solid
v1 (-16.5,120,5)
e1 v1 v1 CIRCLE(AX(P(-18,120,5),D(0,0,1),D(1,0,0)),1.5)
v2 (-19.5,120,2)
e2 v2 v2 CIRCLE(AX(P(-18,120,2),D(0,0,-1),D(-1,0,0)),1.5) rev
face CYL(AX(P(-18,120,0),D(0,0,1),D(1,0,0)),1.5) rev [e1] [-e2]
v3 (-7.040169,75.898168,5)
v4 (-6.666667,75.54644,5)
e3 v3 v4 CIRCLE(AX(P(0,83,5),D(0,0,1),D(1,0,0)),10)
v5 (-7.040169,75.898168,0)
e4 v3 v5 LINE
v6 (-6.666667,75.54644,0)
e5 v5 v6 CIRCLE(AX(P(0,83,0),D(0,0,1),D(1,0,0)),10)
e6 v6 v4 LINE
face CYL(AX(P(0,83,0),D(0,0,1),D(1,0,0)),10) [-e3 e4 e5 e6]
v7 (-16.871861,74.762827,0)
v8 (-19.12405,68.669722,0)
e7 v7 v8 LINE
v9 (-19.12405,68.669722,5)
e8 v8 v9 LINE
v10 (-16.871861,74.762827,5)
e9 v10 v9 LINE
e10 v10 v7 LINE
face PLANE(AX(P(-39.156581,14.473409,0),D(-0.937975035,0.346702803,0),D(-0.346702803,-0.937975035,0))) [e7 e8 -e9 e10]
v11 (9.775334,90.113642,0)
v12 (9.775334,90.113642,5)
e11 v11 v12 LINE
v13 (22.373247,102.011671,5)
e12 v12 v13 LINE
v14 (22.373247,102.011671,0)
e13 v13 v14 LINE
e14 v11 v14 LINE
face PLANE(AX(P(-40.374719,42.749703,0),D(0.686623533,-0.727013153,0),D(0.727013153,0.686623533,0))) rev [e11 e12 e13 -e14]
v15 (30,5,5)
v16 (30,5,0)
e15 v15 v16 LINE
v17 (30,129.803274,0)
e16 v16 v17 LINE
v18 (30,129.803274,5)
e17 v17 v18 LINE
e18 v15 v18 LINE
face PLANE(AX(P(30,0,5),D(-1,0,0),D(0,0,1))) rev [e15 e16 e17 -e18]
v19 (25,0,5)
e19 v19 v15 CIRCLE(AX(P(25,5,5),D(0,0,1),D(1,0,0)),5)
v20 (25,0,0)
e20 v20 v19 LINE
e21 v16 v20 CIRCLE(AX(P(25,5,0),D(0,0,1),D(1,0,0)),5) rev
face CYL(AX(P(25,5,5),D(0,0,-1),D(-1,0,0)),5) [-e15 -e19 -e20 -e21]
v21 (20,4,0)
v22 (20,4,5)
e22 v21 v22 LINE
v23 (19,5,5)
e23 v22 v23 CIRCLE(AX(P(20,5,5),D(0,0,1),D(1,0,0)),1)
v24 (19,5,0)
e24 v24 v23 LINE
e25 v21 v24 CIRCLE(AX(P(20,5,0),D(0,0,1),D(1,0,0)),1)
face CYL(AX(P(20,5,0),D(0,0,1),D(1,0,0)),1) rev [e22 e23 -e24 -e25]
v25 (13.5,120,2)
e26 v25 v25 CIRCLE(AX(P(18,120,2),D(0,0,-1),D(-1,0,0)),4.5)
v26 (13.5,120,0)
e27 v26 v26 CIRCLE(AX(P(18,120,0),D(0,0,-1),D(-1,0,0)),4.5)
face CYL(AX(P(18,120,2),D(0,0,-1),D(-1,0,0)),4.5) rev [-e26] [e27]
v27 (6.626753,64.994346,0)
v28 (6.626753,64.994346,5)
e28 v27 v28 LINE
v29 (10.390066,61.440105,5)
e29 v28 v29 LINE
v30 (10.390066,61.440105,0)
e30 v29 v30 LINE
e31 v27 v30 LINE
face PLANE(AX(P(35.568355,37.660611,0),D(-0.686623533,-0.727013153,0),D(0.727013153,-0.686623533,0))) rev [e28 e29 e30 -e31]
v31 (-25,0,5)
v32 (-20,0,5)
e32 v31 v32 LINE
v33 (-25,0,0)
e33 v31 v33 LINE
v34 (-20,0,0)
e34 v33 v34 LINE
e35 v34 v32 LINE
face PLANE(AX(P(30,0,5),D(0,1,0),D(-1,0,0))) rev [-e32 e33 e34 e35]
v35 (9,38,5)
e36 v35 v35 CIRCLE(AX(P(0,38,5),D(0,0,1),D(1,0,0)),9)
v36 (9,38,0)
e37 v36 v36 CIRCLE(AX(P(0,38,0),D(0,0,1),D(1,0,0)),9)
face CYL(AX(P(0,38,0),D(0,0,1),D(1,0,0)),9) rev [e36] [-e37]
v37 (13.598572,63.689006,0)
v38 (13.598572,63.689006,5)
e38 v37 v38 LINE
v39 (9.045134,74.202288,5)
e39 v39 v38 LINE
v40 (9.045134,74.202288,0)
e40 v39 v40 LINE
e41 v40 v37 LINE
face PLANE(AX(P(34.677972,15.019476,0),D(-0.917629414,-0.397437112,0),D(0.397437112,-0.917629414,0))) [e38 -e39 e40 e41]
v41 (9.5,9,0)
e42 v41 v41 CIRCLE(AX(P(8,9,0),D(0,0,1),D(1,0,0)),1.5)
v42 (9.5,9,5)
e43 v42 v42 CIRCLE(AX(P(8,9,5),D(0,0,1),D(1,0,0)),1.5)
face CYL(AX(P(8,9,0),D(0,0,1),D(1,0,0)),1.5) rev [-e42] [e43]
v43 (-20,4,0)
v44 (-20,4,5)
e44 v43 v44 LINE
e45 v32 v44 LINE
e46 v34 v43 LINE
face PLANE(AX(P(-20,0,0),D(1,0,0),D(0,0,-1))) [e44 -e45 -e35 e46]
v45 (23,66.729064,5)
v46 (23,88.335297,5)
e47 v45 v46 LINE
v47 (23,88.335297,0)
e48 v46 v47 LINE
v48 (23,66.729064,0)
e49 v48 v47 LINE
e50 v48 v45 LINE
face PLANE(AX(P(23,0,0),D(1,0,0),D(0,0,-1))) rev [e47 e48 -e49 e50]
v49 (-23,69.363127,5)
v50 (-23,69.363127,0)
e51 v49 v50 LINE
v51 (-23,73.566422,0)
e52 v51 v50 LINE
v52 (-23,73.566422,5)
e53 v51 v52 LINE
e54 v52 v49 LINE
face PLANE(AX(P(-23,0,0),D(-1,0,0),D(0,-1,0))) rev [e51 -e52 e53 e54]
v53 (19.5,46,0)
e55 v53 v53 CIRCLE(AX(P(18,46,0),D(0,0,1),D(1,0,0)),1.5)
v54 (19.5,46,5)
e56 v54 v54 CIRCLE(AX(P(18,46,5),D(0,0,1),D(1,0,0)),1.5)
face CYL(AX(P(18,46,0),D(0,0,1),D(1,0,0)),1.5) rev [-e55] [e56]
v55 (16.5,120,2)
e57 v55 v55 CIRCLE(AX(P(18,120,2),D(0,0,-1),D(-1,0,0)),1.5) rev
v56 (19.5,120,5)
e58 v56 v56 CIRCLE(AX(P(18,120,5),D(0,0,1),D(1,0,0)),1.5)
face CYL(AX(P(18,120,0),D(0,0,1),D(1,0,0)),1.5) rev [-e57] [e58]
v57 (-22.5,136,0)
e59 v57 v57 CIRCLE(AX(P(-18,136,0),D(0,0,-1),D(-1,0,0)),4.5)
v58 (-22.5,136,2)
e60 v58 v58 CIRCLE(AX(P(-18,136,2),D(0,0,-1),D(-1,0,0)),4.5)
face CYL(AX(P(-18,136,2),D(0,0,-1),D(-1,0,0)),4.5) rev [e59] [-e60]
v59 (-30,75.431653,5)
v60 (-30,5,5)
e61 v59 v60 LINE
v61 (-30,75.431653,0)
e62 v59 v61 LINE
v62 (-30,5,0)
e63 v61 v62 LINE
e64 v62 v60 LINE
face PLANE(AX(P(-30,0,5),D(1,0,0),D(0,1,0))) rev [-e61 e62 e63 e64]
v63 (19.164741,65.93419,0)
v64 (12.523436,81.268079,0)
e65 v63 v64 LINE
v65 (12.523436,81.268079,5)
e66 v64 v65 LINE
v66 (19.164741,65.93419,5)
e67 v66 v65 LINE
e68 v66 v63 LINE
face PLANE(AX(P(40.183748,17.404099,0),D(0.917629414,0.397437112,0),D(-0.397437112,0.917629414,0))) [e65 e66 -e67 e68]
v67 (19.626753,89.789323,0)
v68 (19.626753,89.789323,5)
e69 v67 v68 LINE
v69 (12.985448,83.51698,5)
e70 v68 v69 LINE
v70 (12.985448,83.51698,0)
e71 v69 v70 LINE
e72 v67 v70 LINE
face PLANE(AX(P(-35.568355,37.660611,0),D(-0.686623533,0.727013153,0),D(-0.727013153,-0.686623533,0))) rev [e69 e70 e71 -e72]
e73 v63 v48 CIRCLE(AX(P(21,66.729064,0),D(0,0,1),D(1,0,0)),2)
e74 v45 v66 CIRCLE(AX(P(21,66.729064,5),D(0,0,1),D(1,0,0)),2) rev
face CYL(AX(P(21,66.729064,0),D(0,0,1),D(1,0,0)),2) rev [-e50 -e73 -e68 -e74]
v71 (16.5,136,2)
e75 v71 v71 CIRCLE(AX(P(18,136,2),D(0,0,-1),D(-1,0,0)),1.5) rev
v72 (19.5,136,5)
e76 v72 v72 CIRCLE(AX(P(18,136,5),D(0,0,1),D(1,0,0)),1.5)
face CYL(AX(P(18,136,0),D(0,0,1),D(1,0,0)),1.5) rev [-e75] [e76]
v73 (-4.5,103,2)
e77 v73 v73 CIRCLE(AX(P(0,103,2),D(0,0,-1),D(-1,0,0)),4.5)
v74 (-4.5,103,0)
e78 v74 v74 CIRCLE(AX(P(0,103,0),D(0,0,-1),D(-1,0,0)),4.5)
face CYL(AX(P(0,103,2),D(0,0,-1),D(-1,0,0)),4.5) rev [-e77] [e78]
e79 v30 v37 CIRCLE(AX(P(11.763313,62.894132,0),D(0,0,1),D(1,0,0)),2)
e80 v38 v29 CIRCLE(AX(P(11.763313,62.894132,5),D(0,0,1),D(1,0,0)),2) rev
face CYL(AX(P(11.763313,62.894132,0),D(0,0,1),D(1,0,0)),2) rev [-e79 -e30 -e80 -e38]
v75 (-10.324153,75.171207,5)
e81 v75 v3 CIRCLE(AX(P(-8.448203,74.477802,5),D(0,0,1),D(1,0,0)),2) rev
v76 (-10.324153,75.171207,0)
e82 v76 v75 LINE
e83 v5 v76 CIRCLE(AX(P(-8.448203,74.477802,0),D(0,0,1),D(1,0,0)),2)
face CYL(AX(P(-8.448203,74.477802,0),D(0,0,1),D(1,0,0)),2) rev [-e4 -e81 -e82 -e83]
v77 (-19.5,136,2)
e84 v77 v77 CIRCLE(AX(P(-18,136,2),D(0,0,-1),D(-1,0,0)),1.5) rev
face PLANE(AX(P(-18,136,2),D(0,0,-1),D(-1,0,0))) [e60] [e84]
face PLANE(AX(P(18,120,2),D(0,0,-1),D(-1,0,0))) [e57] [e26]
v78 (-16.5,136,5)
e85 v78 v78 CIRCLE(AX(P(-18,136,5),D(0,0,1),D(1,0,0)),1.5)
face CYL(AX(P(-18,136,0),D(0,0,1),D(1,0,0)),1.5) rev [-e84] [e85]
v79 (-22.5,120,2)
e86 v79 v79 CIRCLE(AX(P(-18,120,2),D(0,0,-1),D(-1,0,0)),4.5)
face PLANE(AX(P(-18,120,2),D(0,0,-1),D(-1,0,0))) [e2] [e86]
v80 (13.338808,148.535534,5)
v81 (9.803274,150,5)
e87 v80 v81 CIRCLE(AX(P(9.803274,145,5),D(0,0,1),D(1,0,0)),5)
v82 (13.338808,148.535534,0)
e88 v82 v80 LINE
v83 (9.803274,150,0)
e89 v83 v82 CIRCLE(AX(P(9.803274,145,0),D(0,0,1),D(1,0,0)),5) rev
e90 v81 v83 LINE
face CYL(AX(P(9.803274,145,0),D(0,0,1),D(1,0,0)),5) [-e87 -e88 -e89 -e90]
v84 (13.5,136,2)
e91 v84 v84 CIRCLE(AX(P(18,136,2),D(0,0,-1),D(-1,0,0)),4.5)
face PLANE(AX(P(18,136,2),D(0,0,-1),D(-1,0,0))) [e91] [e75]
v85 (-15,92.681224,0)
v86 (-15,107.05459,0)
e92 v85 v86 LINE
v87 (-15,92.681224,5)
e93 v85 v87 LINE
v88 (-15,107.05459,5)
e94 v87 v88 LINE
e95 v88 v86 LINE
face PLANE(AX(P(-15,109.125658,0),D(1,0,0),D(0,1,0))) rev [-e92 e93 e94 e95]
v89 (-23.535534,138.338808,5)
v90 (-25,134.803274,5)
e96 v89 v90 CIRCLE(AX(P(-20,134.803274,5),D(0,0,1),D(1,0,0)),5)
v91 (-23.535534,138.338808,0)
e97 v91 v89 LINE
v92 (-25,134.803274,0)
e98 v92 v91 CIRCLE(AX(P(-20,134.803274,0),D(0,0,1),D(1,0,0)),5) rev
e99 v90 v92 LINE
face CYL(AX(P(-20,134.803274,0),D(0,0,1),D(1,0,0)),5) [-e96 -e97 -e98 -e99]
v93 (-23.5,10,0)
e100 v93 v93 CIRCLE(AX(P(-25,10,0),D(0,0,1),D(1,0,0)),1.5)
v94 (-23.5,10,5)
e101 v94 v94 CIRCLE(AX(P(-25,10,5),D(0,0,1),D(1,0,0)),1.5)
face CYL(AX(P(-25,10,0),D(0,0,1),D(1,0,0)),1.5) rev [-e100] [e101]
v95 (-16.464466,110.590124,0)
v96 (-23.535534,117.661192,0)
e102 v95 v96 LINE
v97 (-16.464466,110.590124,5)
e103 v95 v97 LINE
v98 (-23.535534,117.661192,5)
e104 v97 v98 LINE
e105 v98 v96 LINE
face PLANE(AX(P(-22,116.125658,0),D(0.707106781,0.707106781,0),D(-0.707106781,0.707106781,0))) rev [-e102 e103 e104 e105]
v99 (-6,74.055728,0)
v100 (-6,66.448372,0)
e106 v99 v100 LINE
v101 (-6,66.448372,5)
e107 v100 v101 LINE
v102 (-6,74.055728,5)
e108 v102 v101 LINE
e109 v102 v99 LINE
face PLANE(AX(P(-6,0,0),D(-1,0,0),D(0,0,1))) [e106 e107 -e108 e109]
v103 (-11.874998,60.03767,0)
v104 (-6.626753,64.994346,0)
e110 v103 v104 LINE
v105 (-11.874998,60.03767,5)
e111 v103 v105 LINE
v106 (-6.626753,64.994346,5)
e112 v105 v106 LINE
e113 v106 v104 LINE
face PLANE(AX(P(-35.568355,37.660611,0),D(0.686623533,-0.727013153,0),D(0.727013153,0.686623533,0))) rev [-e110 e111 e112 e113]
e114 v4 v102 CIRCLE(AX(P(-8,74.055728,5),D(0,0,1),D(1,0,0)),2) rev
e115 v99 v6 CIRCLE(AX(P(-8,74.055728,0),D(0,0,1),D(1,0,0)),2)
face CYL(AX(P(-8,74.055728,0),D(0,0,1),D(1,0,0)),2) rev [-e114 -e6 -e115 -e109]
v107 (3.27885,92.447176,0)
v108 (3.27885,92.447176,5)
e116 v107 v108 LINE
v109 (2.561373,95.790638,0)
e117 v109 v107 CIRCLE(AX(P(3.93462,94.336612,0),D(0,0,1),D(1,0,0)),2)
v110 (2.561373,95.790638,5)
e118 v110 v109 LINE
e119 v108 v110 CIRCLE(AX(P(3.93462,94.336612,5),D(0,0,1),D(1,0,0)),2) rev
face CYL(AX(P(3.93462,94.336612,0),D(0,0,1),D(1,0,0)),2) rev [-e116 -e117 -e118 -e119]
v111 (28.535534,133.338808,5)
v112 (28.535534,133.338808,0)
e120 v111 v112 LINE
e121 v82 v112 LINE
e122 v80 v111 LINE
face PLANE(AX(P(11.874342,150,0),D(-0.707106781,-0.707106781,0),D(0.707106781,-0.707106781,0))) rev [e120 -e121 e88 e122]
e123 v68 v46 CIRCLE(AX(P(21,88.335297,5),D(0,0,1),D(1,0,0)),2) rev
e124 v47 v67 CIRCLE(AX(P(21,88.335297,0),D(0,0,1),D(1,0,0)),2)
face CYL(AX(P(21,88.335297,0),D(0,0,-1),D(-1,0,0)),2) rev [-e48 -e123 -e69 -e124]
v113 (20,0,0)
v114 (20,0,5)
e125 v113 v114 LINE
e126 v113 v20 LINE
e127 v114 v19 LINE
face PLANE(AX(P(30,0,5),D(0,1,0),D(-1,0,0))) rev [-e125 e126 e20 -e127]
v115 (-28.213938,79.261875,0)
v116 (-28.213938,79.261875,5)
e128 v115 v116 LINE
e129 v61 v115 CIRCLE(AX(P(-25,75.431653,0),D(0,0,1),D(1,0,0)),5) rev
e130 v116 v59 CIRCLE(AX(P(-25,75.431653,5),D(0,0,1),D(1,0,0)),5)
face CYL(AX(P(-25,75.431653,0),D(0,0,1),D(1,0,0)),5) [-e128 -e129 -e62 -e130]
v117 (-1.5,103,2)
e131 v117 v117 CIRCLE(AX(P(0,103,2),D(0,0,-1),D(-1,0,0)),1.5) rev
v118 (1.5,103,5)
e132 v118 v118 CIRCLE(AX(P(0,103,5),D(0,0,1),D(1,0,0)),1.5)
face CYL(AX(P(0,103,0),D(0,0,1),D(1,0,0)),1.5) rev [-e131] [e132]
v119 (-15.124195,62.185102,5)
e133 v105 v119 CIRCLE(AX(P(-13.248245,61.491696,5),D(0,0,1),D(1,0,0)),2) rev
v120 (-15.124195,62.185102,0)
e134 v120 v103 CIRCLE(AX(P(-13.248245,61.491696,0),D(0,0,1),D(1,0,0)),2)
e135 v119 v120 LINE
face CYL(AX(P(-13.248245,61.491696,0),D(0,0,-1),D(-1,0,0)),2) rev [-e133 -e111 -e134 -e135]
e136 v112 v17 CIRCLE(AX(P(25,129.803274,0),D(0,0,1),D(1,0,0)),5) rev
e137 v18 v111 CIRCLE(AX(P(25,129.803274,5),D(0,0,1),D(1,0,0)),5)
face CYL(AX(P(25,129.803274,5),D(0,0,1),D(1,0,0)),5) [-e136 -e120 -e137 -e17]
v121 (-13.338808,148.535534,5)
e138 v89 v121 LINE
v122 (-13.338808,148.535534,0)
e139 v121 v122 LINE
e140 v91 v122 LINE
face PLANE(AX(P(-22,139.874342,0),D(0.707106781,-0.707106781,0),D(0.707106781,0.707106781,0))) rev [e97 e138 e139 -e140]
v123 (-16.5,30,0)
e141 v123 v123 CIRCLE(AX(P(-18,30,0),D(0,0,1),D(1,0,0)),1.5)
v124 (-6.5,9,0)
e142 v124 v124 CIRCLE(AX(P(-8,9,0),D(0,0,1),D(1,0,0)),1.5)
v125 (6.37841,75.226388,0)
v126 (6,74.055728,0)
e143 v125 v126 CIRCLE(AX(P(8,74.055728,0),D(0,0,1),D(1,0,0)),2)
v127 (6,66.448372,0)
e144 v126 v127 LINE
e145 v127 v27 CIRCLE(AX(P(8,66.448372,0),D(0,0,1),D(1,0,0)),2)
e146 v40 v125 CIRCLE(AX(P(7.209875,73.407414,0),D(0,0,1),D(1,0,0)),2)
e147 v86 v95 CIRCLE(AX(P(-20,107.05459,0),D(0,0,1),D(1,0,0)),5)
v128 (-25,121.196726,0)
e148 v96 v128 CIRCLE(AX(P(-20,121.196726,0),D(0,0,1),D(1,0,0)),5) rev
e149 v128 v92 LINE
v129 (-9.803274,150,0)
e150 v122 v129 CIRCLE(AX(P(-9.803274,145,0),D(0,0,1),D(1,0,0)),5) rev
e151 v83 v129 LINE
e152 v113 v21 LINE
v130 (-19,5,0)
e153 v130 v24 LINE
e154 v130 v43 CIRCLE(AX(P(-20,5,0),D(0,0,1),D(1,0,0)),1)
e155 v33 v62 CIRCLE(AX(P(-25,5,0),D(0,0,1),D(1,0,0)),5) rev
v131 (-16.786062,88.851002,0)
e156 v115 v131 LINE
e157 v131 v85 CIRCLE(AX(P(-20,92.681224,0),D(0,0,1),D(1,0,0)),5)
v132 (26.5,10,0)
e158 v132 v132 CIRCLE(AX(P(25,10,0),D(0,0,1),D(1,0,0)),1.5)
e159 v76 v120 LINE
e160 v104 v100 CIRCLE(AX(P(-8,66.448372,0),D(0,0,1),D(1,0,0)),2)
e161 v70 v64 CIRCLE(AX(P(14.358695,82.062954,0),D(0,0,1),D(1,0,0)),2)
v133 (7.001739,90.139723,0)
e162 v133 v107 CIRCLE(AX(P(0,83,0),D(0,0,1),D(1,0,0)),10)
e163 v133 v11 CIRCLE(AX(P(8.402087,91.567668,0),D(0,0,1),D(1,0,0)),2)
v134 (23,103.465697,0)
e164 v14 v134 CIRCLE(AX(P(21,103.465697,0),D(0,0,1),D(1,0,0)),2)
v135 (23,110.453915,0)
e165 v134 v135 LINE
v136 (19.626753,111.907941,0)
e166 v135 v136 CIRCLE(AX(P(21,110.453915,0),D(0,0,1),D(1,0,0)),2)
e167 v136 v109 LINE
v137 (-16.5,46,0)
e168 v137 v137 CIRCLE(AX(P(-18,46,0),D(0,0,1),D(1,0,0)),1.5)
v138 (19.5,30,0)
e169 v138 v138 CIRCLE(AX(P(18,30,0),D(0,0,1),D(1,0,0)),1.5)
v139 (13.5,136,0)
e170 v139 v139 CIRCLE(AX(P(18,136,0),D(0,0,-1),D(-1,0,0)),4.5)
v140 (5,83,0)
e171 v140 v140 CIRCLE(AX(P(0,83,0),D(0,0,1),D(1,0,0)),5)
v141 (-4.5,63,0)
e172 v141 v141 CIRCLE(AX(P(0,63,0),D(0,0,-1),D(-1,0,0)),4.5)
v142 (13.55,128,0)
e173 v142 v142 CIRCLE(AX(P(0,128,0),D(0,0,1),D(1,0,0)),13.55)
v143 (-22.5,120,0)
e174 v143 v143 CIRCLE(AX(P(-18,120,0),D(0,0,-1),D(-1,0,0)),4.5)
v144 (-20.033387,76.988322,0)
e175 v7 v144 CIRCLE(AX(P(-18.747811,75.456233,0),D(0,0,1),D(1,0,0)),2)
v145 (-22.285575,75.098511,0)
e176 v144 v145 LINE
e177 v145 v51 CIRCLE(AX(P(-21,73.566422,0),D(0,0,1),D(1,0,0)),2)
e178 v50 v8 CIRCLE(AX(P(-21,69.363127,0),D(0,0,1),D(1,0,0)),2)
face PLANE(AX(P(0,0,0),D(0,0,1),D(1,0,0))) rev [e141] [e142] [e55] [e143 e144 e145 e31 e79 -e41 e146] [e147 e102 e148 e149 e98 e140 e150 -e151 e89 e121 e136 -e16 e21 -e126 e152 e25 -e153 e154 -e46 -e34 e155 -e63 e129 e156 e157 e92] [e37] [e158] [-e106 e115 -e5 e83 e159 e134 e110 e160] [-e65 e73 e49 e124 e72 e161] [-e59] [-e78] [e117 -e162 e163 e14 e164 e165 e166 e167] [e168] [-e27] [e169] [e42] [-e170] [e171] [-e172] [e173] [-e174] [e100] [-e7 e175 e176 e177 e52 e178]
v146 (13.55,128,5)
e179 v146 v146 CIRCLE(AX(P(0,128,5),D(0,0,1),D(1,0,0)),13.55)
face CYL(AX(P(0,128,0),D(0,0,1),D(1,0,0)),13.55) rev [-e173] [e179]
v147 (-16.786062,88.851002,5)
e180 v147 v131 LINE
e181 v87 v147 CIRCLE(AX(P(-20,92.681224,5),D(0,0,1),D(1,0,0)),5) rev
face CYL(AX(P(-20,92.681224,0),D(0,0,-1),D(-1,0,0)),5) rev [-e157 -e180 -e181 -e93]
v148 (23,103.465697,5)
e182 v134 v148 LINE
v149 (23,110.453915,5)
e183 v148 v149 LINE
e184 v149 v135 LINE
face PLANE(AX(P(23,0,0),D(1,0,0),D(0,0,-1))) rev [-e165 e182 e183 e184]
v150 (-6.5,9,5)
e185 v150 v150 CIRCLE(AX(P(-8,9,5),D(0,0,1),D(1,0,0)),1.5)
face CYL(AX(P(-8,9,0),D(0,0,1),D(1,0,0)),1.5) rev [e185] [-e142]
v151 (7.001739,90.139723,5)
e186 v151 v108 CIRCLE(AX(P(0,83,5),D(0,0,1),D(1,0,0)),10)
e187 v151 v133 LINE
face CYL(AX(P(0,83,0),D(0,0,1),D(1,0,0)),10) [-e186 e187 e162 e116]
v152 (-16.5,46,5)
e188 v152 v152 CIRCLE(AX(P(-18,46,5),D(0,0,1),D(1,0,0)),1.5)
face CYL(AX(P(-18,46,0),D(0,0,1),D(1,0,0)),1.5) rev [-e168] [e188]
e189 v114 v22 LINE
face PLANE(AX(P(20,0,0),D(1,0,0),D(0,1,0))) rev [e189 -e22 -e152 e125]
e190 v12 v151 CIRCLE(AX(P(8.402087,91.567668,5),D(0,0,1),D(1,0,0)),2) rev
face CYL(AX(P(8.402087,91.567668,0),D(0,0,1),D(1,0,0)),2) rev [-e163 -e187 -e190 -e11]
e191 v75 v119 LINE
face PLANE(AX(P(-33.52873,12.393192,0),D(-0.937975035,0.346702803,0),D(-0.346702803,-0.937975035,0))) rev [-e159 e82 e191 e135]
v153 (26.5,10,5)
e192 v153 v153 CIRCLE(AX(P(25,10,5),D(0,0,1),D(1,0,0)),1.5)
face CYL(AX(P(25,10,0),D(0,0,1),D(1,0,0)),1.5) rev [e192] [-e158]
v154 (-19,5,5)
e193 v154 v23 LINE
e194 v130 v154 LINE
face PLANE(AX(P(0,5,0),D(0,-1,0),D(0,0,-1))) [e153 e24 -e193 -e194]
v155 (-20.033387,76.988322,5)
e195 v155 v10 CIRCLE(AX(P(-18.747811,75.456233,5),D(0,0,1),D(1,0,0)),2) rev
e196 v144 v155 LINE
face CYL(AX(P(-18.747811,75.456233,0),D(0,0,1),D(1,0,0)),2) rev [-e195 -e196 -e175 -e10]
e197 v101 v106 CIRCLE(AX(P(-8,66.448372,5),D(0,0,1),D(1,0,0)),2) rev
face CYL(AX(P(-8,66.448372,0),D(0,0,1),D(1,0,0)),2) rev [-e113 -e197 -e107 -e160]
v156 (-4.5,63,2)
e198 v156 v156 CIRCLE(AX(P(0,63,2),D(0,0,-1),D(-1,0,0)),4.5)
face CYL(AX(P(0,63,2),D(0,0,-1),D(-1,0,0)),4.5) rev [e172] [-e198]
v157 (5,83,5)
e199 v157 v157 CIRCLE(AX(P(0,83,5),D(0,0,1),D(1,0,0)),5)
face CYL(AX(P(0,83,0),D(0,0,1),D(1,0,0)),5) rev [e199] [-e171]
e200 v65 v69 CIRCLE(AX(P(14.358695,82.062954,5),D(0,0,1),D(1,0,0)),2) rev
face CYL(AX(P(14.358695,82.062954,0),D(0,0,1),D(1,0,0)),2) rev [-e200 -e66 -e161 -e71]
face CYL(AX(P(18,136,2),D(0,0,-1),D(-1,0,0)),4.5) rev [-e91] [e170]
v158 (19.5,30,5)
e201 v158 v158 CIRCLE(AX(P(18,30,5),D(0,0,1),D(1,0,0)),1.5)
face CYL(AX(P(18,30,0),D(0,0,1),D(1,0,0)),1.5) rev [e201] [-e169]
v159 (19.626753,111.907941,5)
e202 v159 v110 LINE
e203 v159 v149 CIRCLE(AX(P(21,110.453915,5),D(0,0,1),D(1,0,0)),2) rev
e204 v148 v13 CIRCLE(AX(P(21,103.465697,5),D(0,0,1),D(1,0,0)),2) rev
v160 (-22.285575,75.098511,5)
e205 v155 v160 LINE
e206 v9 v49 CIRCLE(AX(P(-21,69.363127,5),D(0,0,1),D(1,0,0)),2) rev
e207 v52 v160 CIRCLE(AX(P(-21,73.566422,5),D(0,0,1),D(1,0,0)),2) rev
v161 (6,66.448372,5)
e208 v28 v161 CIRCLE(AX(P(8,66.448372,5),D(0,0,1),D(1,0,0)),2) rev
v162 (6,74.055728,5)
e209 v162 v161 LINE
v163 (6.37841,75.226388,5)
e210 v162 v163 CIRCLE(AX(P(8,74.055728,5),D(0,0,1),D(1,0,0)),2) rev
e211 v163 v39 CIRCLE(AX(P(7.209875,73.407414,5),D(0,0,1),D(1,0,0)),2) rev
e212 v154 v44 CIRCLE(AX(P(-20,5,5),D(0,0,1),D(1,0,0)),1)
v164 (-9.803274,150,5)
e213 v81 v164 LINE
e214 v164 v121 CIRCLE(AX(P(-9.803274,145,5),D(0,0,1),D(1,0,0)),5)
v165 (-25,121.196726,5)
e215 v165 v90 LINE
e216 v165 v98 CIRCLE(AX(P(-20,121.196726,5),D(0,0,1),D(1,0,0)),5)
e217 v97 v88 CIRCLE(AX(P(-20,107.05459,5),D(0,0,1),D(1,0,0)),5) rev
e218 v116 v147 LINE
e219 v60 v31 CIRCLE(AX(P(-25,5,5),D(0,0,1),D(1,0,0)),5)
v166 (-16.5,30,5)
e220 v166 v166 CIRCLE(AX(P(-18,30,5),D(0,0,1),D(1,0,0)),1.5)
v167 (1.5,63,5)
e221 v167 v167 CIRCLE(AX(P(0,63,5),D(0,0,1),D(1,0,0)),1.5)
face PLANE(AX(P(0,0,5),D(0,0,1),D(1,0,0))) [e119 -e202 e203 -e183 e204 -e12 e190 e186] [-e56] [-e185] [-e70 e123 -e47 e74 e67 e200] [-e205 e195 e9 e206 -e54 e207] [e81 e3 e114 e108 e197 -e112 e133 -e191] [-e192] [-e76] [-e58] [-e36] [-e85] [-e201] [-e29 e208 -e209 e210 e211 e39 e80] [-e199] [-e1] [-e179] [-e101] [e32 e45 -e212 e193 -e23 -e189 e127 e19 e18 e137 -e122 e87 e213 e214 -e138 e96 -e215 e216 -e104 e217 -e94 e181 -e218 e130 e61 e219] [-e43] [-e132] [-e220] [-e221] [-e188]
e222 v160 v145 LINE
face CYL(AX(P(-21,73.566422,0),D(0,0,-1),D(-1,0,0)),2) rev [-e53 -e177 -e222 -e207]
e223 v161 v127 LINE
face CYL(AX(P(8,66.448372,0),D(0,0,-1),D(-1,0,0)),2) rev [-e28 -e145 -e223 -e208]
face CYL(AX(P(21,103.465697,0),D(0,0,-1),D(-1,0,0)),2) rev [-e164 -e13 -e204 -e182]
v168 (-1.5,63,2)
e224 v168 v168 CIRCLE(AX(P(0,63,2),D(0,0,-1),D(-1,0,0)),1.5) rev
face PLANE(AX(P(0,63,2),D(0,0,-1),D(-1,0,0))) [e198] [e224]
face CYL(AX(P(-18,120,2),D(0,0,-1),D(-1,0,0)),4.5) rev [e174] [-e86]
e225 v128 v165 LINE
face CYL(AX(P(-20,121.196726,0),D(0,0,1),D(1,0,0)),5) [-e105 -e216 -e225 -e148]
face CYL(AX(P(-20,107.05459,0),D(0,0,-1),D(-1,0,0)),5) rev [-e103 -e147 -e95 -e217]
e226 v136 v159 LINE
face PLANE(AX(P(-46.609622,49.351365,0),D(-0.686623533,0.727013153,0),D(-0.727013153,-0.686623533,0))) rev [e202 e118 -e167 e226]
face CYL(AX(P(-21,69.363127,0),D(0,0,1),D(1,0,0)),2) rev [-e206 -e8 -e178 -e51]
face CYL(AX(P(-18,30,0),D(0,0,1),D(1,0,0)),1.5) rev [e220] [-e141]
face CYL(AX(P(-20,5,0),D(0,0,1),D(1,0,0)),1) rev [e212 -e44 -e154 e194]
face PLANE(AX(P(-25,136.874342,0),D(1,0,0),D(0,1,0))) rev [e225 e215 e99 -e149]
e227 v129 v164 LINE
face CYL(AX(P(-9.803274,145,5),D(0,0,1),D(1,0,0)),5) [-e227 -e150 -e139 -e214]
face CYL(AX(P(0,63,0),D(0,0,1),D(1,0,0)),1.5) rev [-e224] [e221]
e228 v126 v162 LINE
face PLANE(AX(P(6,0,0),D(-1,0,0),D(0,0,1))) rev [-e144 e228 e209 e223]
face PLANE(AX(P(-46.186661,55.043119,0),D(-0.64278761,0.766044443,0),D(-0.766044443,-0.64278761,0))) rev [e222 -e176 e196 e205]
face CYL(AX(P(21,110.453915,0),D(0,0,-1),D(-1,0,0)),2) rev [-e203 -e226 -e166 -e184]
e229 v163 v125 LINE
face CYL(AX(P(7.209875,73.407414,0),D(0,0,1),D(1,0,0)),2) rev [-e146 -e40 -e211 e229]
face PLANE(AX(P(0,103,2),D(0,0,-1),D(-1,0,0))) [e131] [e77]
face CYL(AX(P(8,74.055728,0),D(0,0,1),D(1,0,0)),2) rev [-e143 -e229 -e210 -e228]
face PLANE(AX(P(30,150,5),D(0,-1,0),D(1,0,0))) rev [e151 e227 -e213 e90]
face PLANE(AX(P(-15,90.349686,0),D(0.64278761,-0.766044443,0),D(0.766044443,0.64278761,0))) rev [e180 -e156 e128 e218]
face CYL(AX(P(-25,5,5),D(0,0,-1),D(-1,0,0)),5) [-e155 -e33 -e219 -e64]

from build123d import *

# Parameters (mm, degrees)
SKETCH_1_W             = 60
SKETCH_1_H             = 150
EXTRUDE_1_DEPTH        = 5
SKETCH_2_R             = 1.5
CUT_EXTRUDE_1_DEPTH    = 5
SKETCH_4_R             = 13.55
SKETCH_4_R_2           = 9
CUT_EXTRUDE_1570_DEPTH = 154.05227865
CUT_EXTRUDE_2_DEPTH    = 154.05227865
SKETCH_6_R             = 5
CUT_EXTRUDE_3_DEPTH    = 154.05227865
SKETCH_7_R             = 1.5
CUT_EXTRUDE_4_DEPTH    = 154.05227865
SKETCH_8_R             = 4.5
CUT_EXTRUDE_5_DEPTH    = 2
CUT_EXTRUDE_6_DEPTH    = 154.05227865
FILLET_3_R             = 2
FILLET_4_R             = 5


with BuildPart() as part:
    # 草图1 → 凸台-拉伸1 (new body)
    with BuildSketch(Plane.XY):
        with Locations((0, 75)):
            Rectangle(SKETCH_1_W, SKETCH_1_H)
    extrude(amount=EXTRUDE_1_DEPTH)

    # 草图2 → 切除-拉伸1 (cut)
    with BuildSketch(Plane.XY.offset(5)):
        with BuildLine():
            Line((-20, 4), (-20, 0))
            Line((-20, 0), (20, 0))
            Line((20, 0), (20, 4))
            ThreePointArc((20, 4), (20.707106781, 5.707106781), (19, 5))
            Line((19, 5), (-19, 5))
            ThreePointArc((-19, 5), (-20.707106781, 5.707106781), (-20, 4))
        make_face()
        with Locations((-25, 10)):
            Circle(SKETCH_2_R)
        with Locations((25, 10)):
            Circle(SKETCH_2_R)
        with Locations((8, 9)):
            Circle(SKETCH_2_R)
        with Locations((-8, 9)):
            Circle(SKETCH_2_R)
    extrude(amount=-CUT_EXTRUDE_1_DEPTH, mode=Mode.SUBTRACT)

    # 草图4 → Cut-Extrude 1570 (cut, through all)
    with BuildSketch(Plane.XY.offset(5)):
        with Locations((0, 128)):
            Circle(SKETCH_4_R)
        with Locations((0, 38)):
            Circle(SKETCH_4_R_2)
    extrude(amount=-CUT_EXTRUDE_1570_DEPTH, mode=Mode.SUBTRACT)

    # 草图5 → 切除-拉伸2 (cut, through all)
    with BuildSketch(Plane.XY.offset(5)):
        Polygon((-15, 106.983208217), (-15, 90.349685577), (-30, 77.76319111), (-30, 124.859512106), (-30, 150), (-11.874342087, 150), (-22, 139.874342087), (-25, 136.874342087), (-25, 119.125657913), (-22, 116.125657913), (-15, 109.125657913), align=None)
        Polygon((11.874342087, 150), (30, 131.874342087), (30, 150), align=None)
    extrude(amount=-CUT_EXTRUDE_2_DEPTH, mode=Mode.SUBTRACT)

    # 草图6 → 切除-拉伸3 (cut, through all)
    with BuildSketch(Plane.XY.offset(5)):
        with Locations((0, 83)):
            Circle(SKETCH_6_R)
    extrude(amount=-CUT_EXTRUDE_3_DEPTH, mode=Mode.SUBTRACT)

    # 草图7 → 切除-拉伸4 (cut, through all)
    with BuildSketch(Plane.XY.offset(5)):
        with Locations((18, 136)):
            Circle(SKETCH_7_R)
        with Locations((-18, 136)):
            Circle(SKETCH_7_R)
        with Locations((-18, 120)):
            Circle(SKETCH_7_R)
        with Locations((18, 120)):
            Circle(SKETCH_7_R)
        with Locations((0, 63)):
            Circle(SKETCH_7_R)
        with Locations((0, 103)):
            Circle(SKETCH_7_R)
        with Locations((-18, 46)):
            Circle(SKETCH_7_R)
        with Locations((-18, 30)):
            Circle(SKETCH_7_R)
        with Locations((18, 46)):
            Circle(SKETCH_7_R)
        with Locations((18, 30)):
            Circle(SKETCH_7_R)
    extrude(amount=-CUT_EXTRUDE_4_DEPTH, mode=Mode.SUBTRACT)

    # 草图8 → 切除-拉伸5 (cut)
    with BuildSketch(Plane(origin=(0, 0, 0), x_dir=(-1, 0, 0), z_dir=(0, 0, -1))):
        with Locations((-18, 136)):
            Circle(SKETCH_8_R)
        with Locations((18, 136)):
            Circle(SKETCH_8_R)
        with Locations((-18, 120)):
            Circle(SKETCH_8_R)
        with Locations((18, 120)):
            Circle(SKETCH_8_R)
        with Locations((0, 103)):
            Circle(SKETCH_8_R)
        with Locations((0, 63)):
            Circle(SKETCH_8_R)
    extrude(amount=-CUT_EXTRUDE_5_DEPTH, mode=Mode.SUBTRACT)

    # 草图9 → 切除-拉伸6 (cut, through all)
    with BuildSketch(Plane.XY.offset(5)):
        Polygon((-23, 58.183667551), (-14.257978987, 81.83446411), (-23, 74.499037502), align=None)
        with BuildLine():
            ThreePointArc((-6, 75), (-7.735015794, 76.662056275), (-9.023511491, 78.689983716))
            Line((-9.023511491, 78.689983716), (-18.086264707, 54.171473379))
            Line((-18.086264707, 54.171473379), (-6, 65.586278935))
            Line((-6, 65.586278935), (-6, 75))
        make_face()
        with BuildLine():
            ThreePointArc((7.893692694, 76.860813111), (7.008875126, 75.867281761), (6, 75))
            Line((6, 75), (6, 65.586278935))
            Line((6, 65.586278935), (17.467722447, 54.75565218))
            Line((17.467722447, 54.75565218), (7.893692694, 76.860813111))
        make_face()
        Polygon((23, 92.975167824), (11.96629434, 82.554445812), (12.398973079, 81.555448171), (23, 57.079087413), align=None)
        with BuildLine():
            Line((23, 115.093785686), (-0.401978174, 92.991917411))
            ThreePointArc((-0.401978174, 92.991917411), (4.47705407, 91.941811162), (8.240956067, 88.664507313))
            Line((8.240956067, 88.664507313), (23, 102.60360436))
            Line((23, 102.60360436), (23, 115.093785686))
        make_face()
    extrude(amount=-CUT_EXTRUDE_6_DEPTH, mode=Mode.SUBTRACT)

    # 圆角3
    # the kernel refuses this fillet: 2 mm, written as the material it adds along each edge
    with BuildSketch(Plane(origin=(-9.023511491, 78.689983716, 5), x_dir=(-0.34670280320630176, -0.9379750349816846, 0), z_dir=(0, 0, -1))) as fillet_3_piece_1:
        with BuildLine():
            CenterArc((3.751460465, -2), FILLET_3_R, 90, 114.464402838)
            ThreePointArc((1.931022987, -2.82825563), (1.087482709, -1.330850611), (0, 0))
            Line((0, 0), (3.751460465, 0))
        make_face()
    extrude(amount=5)
    with BuildSketch(Plane(origin=(-6, 75, 5), x_dir=(-0.7733966621340284, 0.6339223950926041, 0), z_dir=(0, 0, -1))) as fillet_3_piece_2:
        with BuildLine():
            CenterArc((0.948198213, -1.998141534), FILLET_3_R, 92.470208625, 48.189685104)
            Line((-0.598595111, -0.730296743), (0, 0))
            ThreePointArc((0, 0), (0.430999188, -0.009292332), (0.861998376, 0))
        make_face()
    extrude(amount=5)
    with BuildSketch(Plane(origin=(-6, 65.586278935, 5), x_dir=(0, 1, 0), z_dir=(0, 0, -1)), Plane(origin=(6, 65.586278935, 5), x_dir=(0.7270131525498171, -0.6866235329637167, 0), z_dir=(0, 0, -1))) as fillet_3_piece_3:
        with BuildLine():
            CenterArc((FILLET_3_R * 0.431046489238, -FILLET_3_R), FILLET_3_R, 90, 46.636577042)
            Line((-FILLET_3_R * 0.295966663312, -FILLET_3_R * 0.313376467036), (0, 0))
            Line((0, 0), (FILLET_3_R * 0.431046489238, 0))
        make_face()
    extrude(amount=5)
    with BuildSketch(Plane(origin=(-18.086264707, 54.171473379, 5), x_dir=(0.3467028032063488, 0.9379750349816672, 0), z_dir=(0, 0, -1))) as fillet_3_piece_4:
        with BuildLine():
            CenterArc((FILLET_3_R * 4.2717705967, FILLET_3_R), FILLET_3_R, 116.350801131, 153.649198869)
            Line((FILLET_3_R * 3.82790471313, FILLET_3_R * 1.89609323031), (0, 0))
            Line((0, 0), (FILLET_3_R * 4.2717705967, 0))
        make_face()
    extrude(amount=5)
    with BuildSketch(Plane(origin=(6, 75, 5), x_dir=(0, -1, 0), z_dir=(0, 0, -1))) as fillet_3_piece_5:
        with BuildLine():
            CenterArc((0.94427191, -2), FILLET_3_R, 90, 48.189685104)
            ThreePointArc((-0.546440075, -0.666666667), (-0.266033379, -0.339223951), (0, 0))
            Line((0, 0), (0.94427191, 0))
        make_face()
    extrude(amount=5)
    with BuildSketch(Plane(origin=(7.893692694, 76.860813111, 5), x_dir=(0.39743711176533947, -0.9176294144106459, 0), z_dir=(0, 0, -1))) as fillet_3_piece_6:
        with BuildLine():
            CenterArc((2.897165869, 2), FILLET_3_R, 166.489199346, 103.510800654)
            ThreePointArc((0.952514075, 2.467257316), (0.558182396, 1.202000398), (0, 0))
            Line((0, 0), (2.897165869, 0))
        make_face()
    extrude(amount=5)
    with BuildSketch(Plane(origin=(17.467722447, 54.75565218, 5), x_dir=(-0.39743711176536367, 0.9176294144106355, 0), z_dir=(0, 0, -1))) as fillet_3_piece_7:
        with BuildLine():
            CenterArc((FILLET_3_R * 4.86762612827, -FILLET_3_R), FILLET_3_R, 90, 156.781480378)
            Line((FILLET_3_R * 4.47338714864, -FILLET_3_R * 1.91900795804), (0, 0))
            Line((0, 0), (FILLET_3_R * 4.86762612827, 0))
        make_face()
    extrude(amount=5)
    with BuildSketch(Plane(origin=(8.240956067, 88.664507313, 5), x_dir=(0.7270131525498188, 0.6866235329637153, 0), z_dir=(0, 0, -1))) as fillet_3_piece_8:
        with BuildLine():
            CenterArc((2.110522706, -2), FILLET_3_R, 90, 87.804380429)
            ThreePointArc((0.111991009, -1.923377175), (0.102424036, -0.958985229), (0, 0))
            Line((0, 0), (2.110522706, 0))
        make_face()
    extrude(amount=5)
    with BuildSketch(Plane(origin=(-0.401978174, 92.991917411, 5), x_dir=(0.9892255370424882, -0.14639957944953544, 0), z_dir=(0, 0, -1))) as fillet_3_piece_9:
        with BuildLine():
            CenterArc((4.09301108, -1.965082086), FILLET_3_R, 100.722120143, 117.496122758)
            Line((2.521691174, -3.202399246), (0, 0))
            ThreePointArc((0, 0), (1.860459582, -0.174589569), (3.720919164, 0))
        make_face()
    extrude(amount=5)
    with BuildSketch(Plane(origin=(23, 115.093785686, 5), x_dir=(-0.7270131525498174, -0.6866235329637166, 0), z_dir=(0, 0, -1))) as fillet_3_piece_10:
        with BuildLine():
            CenterArc((FILLET_3_R * 2.31993537813, -FILLET_3_R), FILLET_3_R, 90, 133.363422958)
            Line((FILLET_3_R * 1.59292222558, -FILLET_3_R * 1.68662353296), (0, 0))
            Line((0, 0), (FILLET_3_R * 2.31993537813, 0))
        make_face()
    extrude(amount=5)
    with BuildSketch(Plane(origin=(23, 102.60360436, 5), x_dir=(-0.7270131525498177, -0.6866235329637163, 0), z_dir=(0, 0, -1))) as fillet_3_piece_11:
        with BuildLine():
            CenterArc((FILLET_3_R * 0.431046489238, FILLET_3_R), FILLET_3_R, 223.363422958, 46.636577042)
            Line((-FILLET_3_R * 0.295966663312, FILLET_3_R * 0.313376467036), (0, 0))
            Line((0, 0), (FILLET_3_R * 0.431046489238, 0))
        make_face()
    extrude(amount=5)
    with BuildSketch(Plane(origin=(23, 57.079087413, 5), x_dir=(0, 1, 0), z_dir=(0, 0, -1))) as fillet_3_piece_12:
        with BuildLine():
            CenterArc((FILLET_3_R * 4.82498830039, -FILLET_3_R), FILLET_3_R, 90, 156.58194258)
            Line((FILLET_3_R * 4.42755118863, -FILLET_3_R * 1.91762941441), (0, 0))
            Line((0, 0), (FILLET_3_R * 4.82498830039, 0))
        make_face()
    extrude(amount=5)
    with BuildSketch(Plane(origin=(11.96629434, 82.554445812, 5), x_dir=(0.3974371117653669, -0.917629414410634, 0), z_dir=(0, 0, -1))) as fillet_3_piece_13:
        with BuildLine():
            CenterArc((FILLET_3_R * 0.700918309769, -FILLET_3_R), FILLET_3_R, 90, 70.054634461)
            Line((-FILLET_3_R * 0.239100017486, -FILLET_3_R * 0.658876057091), (0, 0))
            Line((0, 0), (FILLET_3_R * 0.700918309769, 0))
        make_face()
    extrude(amount=5)
    with BuildSketch(Plane(origin=(23, 92.975167824, 5), x_dir=(0, -1, 0), z_dir=(0, 0, -1))) as fillet_3_piece_14:
        with BuildLine():
            CenterArc((FILLET_3_R * 2.31993537813, FILLET_3_R), FILLET_3_R, 136.636577042, 133.363422958)
            Line((FILLET_3_R * 1.59292222558, FILLET_3_R * 1.68662353296), (0, 0))
            Line((0, 0), (FILLET_3_R * 2.31993537813, 0))
        make_face()
    extrude(amount=5)
    with BuildSketch(Plane(origin=(-14.257978987, 81.83446411, 5), x_dir=(-0.34670280320634744, -0.9379750349816677, 0), z_dir=(0, 0, -1))) as fillet_3_piece_15:
        with BuildLine():
            CenterArc((FILLET_3_R * 3.76962956743, FILLET_3_R), FILLET_3_R, 119.71422409, 150.28577591)
            Line((FILLET_3_R * 3.27395527024, FILLET_3_R * 1.86850848649), (0, 0))
            Line((0, 0), (FILLET_3_R * 3.76962956743, 0))
        make_face()
    extrude(amount=5)
    with BuildSketch(Plane(origin=(-23, 58.183667551, 5), x_dir=(0.34670280320634733, 0.9379750349816677, 0), z_dir=(0, 0, -1))) as fillet_3_piece_16:
        with BuildLine():
            CenterArc((FILLET_3_R * 5.58972992736, -FILLET_3_R), FILLET_3_R, 90, 159.71422409)
            Line((FILLET_3_R * 5.24302712415, -FILLET_3_R * 1.93797503498), (0, 0))
            Line((0, 0), (FILLET_3_R * 5.58972992736, 0))
        make_face()
    extrude(amount=5)
    with BuildSketch(Plane(origin=(-23, 74.499037502, 5), x_dir=(0, -1, 0), z_dir=(0, 0, -1))) as fillet_3_piece_17:
        with BuildLine():
            CenterArc((FILLET_3_R * 0.466307658155, -FILLET_3_R), FILLET_3_R, 90, 50)
            Line((-FILLET_3_R * 0.299736784964, -FILLET_3_R * 0.357212390313), (0, 0))
            Line((0, 0), (FILLET_3_R * 0.466307658155, 0))
        make_face()
    extrude(amount=5)

    # 圆角4
    fillet_4_edges = [part.edges().sort_by_distance(p)[0] for p in [
        (-11.874342087, 150, 2.5),
        (-25, 136.874342087, 2.5),
        (30, 0, 2.5),
        (-25, 119.125657913, 2.5),
        (-15, 109.125657913, 2.5),
        (-30, 0, 2.5),
        (-15, 90.349685577, 2.5),
        (-30, 77.76319111, 2.5),
        (11.874342087, 150, 2.5),
        (30, 131.874342087, 2.5),
    ]]
    fillet(fillet_4_edges, radius=FILLET_4_R)


solid = part.part
